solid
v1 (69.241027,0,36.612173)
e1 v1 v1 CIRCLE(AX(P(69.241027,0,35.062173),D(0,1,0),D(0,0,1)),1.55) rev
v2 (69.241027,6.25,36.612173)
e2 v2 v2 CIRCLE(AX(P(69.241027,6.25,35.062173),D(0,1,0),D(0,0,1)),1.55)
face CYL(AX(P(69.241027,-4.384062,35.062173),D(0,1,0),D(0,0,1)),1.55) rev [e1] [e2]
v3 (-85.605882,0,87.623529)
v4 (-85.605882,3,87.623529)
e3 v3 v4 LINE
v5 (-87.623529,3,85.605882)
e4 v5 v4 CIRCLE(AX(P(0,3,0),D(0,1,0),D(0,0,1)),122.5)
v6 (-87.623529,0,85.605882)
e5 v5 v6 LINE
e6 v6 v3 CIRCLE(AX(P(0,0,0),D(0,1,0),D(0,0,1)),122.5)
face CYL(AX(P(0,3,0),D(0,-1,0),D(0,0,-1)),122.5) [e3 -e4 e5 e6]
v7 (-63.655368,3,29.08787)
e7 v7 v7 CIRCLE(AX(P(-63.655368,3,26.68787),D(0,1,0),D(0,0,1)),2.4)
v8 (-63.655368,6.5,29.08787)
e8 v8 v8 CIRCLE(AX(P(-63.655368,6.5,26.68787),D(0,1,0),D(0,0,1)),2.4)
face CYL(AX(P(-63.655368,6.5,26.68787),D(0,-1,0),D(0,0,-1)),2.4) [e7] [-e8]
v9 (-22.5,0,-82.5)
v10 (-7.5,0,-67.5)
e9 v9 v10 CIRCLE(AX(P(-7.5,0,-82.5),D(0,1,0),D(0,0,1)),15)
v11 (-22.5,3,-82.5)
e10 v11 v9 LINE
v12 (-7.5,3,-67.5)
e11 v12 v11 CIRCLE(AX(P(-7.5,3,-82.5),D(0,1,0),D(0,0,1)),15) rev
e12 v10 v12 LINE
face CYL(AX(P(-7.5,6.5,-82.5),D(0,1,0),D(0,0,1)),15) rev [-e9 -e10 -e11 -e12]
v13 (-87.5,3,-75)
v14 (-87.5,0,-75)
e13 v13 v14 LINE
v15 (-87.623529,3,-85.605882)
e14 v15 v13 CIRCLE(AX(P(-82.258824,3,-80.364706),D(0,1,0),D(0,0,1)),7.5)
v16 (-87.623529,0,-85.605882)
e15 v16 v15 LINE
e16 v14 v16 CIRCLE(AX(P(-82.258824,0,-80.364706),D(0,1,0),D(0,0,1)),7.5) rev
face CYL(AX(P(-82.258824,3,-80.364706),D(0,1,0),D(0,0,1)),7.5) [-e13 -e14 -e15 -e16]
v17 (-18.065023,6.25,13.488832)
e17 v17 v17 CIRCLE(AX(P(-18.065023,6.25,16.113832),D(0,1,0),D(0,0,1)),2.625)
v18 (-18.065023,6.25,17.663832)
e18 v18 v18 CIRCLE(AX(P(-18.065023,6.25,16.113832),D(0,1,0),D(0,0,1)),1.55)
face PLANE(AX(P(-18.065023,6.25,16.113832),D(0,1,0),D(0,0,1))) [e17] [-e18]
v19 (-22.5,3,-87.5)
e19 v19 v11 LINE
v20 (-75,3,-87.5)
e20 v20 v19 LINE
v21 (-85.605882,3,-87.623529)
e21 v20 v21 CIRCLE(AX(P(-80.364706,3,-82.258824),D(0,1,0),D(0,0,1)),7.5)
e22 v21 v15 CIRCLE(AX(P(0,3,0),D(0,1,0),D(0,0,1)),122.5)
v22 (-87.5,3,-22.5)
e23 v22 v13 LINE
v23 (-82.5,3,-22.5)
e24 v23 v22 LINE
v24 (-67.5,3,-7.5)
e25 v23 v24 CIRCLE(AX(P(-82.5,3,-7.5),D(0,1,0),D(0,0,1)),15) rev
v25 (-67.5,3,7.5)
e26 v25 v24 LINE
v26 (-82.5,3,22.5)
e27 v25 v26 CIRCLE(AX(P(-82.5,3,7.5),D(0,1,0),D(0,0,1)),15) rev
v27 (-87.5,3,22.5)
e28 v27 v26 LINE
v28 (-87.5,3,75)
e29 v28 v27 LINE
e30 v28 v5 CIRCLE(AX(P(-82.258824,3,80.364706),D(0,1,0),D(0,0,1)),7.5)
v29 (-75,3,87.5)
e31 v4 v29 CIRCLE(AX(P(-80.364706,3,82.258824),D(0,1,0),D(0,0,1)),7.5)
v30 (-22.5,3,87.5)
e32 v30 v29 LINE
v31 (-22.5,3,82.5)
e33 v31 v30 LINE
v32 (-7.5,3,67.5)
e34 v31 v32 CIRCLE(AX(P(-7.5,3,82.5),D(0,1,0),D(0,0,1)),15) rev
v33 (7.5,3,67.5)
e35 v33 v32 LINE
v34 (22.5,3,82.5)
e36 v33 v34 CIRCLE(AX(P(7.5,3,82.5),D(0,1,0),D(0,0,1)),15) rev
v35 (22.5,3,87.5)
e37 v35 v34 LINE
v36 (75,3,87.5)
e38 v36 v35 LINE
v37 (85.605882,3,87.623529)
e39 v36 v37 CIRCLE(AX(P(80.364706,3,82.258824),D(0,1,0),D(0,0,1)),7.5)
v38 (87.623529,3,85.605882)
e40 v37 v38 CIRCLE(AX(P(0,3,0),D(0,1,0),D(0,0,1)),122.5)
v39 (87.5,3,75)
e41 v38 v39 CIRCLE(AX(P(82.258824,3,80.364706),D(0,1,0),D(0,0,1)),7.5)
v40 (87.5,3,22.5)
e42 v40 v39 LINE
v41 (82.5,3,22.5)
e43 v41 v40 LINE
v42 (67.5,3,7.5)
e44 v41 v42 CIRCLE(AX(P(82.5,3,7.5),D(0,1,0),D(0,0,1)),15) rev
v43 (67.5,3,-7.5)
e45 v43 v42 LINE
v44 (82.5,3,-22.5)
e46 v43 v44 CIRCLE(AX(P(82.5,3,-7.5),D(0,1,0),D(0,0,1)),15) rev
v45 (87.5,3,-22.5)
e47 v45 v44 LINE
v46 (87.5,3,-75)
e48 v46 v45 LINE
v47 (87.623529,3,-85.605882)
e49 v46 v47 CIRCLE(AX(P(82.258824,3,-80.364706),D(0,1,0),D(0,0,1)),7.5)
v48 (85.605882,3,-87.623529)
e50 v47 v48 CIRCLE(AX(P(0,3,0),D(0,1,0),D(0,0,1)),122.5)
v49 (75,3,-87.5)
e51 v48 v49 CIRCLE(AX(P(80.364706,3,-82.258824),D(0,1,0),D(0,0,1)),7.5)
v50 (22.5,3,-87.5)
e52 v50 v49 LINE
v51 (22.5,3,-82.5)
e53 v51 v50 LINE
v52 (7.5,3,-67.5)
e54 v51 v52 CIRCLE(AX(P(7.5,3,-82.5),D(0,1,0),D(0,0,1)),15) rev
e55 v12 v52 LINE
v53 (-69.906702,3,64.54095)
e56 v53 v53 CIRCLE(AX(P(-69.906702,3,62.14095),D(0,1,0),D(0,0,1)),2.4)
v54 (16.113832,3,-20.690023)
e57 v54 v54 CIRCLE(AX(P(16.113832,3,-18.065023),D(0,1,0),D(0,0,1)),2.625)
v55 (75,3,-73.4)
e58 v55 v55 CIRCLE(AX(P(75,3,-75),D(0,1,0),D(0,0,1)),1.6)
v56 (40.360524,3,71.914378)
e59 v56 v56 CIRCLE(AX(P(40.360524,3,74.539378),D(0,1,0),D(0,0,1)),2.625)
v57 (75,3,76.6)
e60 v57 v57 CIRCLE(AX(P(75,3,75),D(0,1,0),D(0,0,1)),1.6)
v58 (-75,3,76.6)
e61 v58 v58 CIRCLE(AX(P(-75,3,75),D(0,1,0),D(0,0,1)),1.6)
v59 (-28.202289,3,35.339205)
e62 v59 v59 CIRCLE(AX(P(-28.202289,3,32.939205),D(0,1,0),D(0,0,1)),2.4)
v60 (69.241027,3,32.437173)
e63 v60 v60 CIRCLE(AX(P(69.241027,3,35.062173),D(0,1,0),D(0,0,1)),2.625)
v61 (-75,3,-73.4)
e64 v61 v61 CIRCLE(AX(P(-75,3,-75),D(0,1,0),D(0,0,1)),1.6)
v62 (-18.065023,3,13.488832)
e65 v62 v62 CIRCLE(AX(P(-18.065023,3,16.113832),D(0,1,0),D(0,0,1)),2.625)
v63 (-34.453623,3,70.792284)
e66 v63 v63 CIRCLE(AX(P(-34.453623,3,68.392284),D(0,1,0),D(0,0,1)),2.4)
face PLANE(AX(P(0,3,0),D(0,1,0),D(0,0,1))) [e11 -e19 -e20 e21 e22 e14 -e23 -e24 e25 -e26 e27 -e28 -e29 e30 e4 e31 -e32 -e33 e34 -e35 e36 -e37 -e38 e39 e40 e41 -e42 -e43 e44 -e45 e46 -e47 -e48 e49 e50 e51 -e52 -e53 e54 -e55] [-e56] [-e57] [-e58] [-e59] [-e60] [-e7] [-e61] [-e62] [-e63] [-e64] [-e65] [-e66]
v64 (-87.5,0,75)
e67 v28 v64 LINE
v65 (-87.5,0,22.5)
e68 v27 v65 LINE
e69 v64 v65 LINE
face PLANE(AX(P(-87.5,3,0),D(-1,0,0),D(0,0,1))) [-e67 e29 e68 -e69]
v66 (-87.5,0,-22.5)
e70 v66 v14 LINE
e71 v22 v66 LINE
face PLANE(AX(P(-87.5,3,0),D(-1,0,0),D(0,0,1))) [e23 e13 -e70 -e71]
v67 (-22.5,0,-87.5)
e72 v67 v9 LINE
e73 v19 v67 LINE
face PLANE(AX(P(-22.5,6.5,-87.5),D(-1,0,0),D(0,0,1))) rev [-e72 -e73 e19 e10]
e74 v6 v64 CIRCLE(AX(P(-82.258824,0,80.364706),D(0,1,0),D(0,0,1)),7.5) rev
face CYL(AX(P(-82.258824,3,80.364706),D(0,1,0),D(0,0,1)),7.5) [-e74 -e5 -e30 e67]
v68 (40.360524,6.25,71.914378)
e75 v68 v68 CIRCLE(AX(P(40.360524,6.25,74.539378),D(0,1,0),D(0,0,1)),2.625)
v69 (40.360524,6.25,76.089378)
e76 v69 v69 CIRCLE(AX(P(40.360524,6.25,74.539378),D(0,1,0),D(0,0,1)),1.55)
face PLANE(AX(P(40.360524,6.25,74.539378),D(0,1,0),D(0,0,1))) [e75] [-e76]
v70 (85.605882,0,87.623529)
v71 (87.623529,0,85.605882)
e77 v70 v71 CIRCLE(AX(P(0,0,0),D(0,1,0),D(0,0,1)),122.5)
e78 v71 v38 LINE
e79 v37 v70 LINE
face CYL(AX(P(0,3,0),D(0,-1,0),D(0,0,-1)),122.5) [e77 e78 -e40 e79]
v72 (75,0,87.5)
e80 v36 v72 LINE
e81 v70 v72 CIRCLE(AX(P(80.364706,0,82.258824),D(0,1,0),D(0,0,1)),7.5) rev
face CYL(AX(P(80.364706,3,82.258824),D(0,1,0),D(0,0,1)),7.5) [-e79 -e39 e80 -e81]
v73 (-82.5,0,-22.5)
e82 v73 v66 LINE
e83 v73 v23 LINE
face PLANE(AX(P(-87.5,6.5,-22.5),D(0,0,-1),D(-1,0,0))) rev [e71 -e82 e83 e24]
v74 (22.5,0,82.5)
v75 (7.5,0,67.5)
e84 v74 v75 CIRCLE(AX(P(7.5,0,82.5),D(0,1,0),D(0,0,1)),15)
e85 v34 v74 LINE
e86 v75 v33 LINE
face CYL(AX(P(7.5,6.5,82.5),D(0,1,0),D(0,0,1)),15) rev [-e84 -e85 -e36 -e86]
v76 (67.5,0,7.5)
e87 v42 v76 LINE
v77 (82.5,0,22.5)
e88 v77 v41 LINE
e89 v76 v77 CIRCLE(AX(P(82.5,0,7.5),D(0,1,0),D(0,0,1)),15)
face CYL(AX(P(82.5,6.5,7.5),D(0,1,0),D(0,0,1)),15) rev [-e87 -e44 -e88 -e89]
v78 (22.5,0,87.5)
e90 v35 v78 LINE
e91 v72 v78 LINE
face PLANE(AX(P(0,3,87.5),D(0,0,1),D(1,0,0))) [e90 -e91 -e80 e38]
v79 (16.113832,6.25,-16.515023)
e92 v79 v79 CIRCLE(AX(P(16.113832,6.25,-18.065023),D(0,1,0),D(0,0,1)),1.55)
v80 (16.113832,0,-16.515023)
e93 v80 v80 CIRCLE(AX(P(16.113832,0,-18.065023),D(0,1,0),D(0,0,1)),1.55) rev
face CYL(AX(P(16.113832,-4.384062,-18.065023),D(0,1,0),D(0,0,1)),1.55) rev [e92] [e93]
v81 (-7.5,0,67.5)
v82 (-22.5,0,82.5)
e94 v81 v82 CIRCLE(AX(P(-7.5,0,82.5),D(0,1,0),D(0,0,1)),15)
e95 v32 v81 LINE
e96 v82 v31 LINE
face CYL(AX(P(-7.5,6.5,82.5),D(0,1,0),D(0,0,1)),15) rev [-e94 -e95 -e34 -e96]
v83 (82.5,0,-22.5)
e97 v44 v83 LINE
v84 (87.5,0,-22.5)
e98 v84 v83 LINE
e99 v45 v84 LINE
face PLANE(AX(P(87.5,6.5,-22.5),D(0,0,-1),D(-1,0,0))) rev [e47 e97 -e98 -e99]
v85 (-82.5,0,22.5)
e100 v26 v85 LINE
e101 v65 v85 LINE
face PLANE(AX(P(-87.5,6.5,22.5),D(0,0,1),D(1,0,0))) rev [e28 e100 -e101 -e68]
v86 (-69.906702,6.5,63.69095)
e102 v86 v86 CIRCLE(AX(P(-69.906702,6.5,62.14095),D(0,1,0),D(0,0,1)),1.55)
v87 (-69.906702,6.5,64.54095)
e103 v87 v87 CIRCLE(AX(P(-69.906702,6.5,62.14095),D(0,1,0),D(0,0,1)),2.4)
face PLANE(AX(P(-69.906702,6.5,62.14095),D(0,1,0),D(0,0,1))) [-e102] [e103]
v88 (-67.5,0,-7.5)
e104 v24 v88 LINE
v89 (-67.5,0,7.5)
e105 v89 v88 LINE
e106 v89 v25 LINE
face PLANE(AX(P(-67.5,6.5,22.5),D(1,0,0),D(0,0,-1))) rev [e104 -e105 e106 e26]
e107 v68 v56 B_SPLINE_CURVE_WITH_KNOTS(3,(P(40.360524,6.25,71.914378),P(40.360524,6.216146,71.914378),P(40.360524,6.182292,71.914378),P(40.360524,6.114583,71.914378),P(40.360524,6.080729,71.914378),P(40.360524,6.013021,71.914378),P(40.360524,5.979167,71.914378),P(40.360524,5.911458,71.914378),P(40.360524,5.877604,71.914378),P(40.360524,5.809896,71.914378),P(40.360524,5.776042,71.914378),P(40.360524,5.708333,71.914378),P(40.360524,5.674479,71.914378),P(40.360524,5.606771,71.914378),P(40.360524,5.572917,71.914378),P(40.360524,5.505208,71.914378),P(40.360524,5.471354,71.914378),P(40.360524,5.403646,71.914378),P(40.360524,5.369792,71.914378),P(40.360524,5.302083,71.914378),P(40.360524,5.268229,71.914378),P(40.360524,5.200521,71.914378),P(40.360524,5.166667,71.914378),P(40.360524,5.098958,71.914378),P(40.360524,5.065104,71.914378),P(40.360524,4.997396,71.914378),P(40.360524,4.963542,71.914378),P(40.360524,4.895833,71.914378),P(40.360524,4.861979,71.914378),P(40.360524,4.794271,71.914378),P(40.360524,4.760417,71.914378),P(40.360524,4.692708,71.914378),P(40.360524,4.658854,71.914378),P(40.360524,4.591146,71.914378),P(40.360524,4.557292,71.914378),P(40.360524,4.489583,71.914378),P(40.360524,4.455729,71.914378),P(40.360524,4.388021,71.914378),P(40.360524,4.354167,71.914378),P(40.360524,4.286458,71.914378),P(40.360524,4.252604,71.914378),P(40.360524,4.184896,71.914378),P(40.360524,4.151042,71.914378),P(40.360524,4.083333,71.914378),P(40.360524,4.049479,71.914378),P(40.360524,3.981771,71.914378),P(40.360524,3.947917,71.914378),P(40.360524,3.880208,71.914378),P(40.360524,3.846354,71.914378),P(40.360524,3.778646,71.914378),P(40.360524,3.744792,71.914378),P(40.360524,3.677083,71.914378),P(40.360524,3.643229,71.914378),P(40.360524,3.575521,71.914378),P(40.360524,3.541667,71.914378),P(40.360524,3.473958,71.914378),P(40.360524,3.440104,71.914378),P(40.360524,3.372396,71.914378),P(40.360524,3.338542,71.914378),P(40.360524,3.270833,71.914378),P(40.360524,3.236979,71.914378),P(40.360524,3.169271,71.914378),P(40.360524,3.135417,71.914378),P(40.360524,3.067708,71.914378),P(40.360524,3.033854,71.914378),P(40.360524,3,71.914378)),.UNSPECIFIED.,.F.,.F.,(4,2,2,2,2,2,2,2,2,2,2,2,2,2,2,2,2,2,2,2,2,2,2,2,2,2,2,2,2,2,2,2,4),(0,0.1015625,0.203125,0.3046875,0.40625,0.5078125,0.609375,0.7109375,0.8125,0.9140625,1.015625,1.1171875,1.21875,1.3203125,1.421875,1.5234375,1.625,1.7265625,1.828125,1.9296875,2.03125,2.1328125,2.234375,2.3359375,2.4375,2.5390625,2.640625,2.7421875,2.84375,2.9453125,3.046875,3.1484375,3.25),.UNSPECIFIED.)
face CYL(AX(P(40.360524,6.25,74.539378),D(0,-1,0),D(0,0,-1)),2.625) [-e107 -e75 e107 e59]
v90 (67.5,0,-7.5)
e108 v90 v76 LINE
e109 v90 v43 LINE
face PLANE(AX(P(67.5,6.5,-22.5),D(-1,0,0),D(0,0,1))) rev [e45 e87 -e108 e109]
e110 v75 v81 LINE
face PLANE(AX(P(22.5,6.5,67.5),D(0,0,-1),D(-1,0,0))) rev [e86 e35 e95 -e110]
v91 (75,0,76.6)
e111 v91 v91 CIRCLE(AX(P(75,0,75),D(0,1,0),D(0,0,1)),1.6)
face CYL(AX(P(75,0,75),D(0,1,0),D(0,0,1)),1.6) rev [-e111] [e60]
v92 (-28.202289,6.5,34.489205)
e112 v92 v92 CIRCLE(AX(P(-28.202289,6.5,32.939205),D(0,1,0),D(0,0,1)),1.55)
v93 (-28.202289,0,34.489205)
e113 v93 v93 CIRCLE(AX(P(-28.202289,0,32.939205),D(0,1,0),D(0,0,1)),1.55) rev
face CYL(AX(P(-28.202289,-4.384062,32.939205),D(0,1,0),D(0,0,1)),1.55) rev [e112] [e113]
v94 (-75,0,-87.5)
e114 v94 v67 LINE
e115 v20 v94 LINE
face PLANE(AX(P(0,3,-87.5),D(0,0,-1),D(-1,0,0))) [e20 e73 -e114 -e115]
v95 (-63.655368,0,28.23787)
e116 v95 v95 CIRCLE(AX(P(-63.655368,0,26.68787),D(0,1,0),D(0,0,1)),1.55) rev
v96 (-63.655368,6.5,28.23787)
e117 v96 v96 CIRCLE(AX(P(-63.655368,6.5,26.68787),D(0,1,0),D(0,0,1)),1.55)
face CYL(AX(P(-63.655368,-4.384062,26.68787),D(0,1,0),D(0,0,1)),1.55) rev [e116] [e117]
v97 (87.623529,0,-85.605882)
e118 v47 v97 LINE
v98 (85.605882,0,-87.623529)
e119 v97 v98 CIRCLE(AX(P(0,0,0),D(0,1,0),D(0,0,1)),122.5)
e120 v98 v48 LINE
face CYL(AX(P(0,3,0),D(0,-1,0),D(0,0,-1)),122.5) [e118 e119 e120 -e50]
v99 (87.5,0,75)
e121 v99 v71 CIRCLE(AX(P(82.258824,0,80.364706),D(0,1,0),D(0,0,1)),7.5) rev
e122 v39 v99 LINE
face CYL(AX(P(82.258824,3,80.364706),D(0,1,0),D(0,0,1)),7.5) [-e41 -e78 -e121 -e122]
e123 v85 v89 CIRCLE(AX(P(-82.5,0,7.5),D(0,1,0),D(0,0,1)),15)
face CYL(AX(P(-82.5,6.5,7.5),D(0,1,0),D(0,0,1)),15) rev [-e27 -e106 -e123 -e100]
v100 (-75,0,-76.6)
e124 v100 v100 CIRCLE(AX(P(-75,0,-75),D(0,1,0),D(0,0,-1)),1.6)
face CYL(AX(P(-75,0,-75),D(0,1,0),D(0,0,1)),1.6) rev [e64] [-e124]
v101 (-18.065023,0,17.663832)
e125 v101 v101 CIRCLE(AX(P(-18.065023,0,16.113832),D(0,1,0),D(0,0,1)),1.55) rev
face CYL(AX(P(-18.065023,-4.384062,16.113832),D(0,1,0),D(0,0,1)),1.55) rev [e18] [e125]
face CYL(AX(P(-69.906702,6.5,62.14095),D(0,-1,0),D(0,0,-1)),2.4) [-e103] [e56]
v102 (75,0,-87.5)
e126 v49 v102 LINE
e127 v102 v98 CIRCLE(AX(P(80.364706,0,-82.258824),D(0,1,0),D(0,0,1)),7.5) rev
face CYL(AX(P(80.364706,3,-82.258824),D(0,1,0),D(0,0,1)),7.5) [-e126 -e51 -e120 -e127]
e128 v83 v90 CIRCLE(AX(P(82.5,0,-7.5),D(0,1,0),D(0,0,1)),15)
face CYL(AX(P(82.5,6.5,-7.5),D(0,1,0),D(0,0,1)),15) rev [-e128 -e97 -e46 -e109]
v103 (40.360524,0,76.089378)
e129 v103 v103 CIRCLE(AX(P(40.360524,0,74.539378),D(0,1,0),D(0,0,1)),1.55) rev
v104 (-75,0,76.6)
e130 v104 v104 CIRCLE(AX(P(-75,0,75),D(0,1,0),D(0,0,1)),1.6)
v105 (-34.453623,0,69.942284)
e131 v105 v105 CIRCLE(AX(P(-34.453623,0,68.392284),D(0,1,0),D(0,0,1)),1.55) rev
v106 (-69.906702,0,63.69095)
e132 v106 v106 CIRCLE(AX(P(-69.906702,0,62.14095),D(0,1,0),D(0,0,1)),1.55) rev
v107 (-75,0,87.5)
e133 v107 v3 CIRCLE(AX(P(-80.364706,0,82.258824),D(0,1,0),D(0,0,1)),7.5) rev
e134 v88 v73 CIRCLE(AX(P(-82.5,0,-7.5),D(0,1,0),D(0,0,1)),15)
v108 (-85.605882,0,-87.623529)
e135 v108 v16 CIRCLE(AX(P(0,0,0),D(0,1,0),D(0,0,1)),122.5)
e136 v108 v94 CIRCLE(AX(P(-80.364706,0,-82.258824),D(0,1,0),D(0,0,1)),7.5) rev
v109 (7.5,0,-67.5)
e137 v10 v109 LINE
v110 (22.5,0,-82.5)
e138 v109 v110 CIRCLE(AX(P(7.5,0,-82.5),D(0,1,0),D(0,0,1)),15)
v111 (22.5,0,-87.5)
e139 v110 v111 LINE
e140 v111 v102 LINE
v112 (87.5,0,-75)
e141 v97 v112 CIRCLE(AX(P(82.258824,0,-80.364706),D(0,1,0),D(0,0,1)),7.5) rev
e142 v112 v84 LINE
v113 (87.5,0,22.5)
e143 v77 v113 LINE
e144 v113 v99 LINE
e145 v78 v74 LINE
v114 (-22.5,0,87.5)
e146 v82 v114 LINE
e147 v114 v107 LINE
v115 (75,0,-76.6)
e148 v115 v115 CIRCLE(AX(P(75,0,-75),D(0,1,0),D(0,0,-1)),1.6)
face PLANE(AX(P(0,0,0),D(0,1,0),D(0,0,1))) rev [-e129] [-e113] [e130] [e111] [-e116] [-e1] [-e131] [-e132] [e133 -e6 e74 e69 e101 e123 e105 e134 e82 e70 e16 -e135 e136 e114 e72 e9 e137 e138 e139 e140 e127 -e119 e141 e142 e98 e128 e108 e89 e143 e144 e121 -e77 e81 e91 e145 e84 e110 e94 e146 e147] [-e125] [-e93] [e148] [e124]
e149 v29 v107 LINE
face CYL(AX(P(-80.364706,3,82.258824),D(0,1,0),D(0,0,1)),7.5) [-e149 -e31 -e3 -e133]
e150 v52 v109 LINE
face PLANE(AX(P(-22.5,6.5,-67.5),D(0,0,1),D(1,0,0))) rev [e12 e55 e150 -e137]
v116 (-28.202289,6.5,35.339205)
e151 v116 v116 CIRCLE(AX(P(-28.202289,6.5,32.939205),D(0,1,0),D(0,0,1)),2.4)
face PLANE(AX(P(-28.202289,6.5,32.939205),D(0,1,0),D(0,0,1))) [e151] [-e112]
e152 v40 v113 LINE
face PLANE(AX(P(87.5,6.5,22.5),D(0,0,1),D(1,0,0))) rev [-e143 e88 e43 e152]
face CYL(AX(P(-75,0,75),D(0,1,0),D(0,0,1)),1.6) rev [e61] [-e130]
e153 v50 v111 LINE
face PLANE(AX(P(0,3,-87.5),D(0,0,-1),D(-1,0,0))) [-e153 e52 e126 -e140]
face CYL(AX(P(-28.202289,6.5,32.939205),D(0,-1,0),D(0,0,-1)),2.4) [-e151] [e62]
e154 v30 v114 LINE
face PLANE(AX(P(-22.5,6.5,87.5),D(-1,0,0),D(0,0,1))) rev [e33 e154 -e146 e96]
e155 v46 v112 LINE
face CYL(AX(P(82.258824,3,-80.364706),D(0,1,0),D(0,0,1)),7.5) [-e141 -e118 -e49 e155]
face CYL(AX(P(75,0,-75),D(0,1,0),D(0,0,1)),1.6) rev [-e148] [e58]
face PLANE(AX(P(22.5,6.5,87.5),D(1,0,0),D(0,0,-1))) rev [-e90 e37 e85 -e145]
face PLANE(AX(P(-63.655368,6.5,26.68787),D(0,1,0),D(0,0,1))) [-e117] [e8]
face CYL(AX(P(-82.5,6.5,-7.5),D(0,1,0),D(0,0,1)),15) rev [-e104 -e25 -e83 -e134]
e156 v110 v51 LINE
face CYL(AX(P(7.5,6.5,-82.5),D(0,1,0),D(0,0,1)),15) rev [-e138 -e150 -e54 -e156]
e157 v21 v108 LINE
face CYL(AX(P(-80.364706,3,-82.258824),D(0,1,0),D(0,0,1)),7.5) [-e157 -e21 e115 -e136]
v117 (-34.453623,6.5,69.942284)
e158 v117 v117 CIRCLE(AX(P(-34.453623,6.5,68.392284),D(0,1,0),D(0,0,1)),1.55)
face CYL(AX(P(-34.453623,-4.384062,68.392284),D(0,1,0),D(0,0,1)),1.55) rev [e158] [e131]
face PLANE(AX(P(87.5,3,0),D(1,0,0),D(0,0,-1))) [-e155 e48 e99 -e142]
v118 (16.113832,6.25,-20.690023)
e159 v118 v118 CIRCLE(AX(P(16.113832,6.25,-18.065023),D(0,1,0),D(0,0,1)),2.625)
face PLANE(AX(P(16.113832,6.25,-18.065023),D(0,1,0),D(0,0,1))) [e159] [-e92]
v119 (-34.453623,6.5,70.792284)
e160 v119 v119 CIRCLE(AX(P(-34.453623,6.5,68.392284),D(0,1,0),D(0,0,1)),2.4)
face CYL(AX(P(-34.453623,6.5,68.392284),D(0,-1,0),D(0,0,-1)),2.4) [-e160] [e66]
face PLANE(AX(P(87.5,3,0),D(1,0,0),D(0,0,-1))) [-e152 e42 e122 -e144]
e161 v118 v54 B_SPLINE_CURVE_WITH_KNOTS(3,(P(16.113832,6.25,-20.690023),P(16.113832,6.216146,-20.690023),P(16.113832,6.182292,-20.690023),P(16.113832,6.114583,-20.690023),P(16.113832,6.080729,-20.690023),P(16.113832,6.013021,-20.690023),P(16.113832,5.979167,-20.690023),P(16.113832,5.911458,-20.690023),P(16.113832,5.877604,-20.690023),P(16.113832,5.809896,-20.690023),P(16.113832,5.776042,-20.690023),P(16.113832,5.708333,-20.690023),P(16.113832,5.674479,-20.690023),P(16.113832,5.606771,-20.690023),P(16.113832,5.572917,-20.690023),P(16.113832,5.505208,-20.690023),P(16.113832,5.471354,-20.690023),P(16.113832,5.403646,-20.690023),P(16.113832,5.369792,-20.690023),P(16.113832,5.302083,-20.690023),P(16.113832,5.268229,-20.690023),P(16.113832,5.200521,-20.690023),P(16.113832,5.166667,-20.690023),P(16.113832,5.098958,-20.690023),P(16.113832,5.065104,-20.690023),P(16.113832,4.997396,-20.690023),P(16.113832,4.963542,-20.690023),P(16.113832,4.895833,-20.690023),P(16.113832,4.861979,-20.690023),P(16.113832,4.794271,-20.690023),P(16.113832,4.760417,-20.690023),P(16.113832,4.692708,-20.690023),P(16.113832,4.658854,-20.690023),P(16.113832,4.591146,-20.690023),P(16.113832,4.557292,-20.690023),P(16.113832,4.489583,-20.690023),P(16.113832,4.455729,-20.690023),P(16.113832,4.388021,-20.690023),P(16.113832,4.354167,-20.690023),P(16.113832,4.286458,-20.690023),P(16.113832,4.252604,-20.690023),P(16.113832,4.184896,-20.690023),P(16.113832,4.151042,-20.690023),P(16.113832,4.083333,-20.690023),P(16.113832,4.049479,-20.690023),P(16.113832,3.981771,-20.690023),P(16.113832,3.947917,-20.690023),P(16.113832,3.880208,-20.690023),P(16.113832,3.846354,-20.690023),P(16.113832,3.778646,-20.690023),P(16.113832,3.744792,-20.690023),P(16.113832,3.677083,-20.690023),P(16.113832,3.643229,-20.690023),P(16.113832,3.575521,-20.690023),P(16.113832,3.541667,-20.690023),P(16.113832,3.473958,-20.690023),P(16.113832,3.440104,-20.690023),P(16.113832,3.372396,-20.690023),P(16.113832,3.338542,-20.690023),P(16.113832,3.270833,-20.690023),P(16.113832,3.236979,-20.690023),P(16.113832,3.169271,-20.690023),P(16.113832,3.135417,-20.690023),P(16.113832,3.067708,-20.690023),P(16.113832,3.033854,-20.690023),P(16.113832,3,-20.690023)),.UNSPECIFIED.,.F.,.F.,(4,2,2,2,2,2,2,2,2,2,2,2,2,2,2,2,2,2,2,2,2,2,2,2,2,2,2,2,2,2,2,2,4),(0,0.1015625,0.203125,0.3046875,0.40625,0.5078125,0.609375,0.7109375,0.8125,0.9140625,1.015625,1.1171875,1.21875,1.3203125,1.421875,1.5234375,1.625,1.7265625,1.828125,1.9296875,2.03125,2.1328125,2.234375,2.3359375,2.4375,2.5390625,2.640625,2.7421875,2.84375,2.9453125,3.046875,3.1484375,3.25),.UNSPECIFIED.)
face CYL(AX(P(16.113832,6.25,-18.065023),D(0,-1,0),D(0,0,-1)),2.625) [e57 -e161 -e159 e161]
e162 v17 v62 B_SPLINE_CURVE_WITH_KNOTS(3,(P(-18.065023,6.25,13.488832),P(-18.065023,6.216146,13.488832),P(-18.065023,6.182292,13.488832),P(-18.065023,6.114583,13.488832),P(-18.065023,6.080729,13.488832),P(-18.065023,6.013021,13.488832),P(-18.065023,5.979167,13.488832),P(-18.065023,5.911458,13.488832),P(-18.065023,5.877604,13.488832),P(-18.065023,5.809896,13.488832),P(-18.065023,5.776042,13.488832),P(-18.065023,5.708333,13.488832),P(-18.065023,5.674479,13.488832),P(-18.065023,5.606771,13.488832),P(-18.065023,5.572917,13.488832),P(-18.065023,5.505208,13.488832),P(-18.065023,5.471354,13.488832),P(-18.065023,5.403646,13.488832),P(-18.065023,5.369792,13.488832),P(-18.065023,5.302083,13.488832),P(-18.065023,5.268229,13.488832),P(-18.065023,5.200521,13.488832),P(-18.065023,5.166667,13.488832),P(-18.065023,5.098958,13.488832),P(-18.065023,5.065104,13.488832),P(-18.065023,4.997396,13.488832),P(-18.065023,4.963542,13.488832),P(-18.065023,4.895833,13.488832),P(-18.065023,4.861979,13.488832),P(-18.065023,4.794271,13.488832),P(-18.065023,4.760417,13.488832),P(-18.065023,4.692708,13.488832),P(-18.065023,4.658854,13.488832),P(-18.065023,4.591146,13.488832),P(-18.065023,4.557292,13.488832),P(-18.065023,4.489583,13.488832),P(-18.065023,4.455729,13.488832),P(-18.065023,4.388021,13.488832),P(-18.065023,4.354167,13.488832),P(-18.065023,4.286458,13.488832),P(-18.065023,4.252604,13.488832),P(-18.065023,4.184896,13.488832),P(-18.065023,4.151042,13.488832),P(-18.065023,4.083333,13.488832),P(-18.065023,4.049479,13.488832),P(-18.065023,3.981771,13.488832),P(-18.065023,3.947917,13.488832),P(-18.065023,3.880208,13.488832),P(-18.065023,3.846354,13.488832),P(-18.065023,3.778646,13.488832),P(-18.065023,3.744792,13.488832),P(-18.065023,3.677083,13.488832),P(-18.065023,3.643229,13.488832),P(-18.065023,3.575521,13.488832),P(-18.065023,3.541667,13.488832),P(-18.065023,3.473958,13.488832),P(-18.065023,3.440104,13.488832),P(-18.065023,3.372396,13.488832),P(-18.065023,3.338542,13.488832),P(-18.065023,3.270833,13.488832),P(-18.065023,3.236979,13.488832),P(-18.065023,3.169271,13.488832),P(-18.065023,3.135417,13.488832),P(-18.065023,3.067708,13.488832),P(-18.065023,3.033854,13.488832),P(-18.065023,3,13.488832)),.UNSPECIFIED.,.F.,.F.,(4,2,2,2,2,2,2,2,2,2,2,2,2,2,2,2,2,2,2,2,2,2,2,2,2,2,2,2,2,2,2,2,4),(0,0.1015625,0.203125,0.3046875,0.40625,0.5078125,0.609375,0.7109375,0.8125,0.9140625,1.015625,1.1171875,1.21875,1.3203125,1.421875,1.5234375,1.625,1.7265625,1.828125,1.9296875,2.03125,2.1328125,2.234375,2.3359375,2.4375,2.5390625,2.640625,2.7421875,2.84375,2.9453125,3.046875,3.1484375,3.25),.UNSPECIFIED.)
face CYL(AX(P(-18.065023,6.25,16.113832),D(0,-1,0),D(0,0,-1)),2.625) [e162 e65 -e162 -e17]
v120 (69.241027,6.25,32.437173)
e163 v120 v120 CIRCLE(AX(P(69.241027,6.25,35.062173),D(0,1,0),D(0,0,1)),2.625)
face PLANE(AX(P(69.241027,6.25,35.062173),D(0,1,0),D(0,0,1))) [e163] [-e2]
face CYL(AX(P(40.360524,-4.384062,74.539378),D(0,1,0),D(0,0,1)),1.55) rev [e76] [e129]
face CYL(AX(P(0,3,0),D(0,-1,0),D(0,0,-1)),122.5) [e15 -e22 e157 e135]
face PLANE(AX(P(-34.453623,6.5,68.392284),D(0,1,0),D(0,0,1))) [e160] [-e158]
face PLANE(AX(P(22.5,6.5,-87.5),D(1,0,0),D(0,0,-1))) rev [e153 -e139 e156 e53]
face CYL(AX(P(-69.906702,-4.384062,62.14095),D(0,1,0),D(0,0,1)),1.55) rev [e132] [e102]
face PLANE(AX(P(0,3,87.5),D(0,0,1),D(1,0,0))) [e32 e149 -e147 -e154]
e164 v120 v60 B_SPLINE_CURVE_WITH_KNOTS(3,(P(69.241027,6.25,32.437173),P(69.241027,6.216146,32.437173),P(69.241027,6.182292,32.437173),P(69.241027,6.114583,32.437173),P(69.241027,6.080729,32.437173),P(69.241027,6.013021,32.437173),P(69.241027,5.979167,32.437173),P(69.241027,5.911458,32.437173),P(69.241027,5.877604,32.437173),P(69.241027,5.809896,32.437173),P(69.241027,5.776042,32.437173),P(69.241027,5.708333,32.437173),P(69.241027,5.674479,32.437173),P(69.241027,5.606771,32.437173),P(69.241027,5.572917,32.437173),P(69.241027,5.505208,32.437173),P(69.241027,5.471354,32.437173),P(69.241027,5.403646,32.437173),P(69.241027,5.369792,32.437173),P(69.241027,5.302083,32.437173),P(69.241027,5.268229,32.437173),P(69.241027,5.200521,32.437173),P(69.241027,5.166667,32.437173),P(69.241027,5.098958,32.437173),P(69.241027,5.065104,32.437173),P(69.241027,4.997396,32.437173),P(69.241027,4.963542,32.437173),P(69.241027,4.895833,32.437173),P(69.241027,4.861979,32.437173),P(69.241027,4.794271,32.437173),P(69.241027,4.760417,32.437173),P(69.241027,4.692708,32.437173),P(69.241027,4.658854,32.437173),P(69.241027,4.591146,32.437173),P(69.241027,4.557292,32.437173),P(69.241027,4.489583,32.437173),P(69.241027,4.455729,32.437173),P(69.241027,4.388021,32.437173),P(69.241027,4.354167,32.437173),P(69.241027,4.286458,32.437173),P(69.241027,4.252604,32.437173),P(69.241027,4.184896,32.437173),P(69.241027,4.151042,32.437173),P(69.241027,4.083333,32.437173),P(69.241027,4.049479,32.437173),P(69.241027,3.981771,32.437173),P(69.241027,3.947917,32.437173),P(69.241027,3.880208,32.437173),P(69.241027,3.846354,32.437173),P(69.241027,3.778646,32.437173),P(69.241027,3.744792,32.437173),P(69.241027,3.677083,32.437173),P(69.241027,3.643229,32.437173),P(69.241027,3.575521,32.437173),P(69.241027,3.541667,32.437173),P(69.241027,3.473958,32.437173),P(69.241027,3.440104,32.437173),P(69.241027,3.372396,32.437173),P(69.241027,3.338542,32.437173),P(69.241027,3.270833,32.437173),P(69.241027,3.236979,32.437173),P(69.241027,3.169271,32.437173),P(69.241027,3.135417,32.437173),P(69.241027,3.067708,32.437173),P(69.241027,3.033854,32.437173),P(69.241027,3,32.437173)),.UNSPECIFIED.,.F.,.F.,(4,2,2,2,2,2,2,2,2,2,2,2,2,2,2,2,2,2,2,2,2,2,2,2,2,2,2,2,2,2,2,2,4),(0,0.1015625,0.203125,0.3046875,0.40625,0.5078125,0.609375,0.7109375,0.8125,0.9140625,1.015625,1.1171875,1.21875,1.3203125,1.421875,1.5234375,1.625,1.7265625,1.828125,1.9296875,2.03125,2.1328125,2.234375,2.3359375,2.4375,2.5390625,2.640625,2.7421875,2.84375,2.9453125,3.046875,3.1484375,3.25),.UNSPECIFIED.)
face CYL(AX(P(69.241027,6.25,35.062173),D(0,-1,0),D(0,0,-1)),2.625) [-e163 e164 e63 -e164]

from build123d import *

# Parameters (mm, degrees)
SHELL_BOSS_DEPTH             = 3
SHELL_FILET_R                = 7.5
SHELL_PILLAR_HOLE_DEPTH      = 127.973590966
SHELL_PILLAR_HOLE_DEPTH_BACK = 127.973590966
SKETCH5_R                    = 1.6
SKETCH16_R                   = 2.625
ARDUINO_MOUNT_BOSS_DEPTH     = 3.25
SKETCH22_R                   = 1.55
ARDUINO_CUT_DEPTH            = 6.25
SKETCH20_R                   = 2.4
BOSS_EXTRUDE9_DEPTH          = 3.5
SKETCH37_R                   = 1.55
CUT_EXTRUDE4_DEPTH           = 6.5
CUT_EXTRUDE5_DEPTH           = 128.104456266
CUT_EXTRUDE5_DEPTH_BACK      = 128.104456266
SKETCH38_W                   = 45
SKETCH38_H                   = 20
SKETCH38_W_2                 = 20
SKETCH38_H_2                 = 45
FILLET1_R                    = 15


with BuildPart() as part:
    # Sketch1 → shell-boss (new body)
    with BuildSketch(Plane(origin=(0, 0, 0), x_dir=(1, 0, 0), z_dir=(0, 1, 0))):
        with BuildLine():
            Line((87.5, 75), (96.856853139, 75))
            ThreePointArc((96.856853139, 75), (86.620580695, 86.620580695), (75, 96.856853139))
            Line((75, 96.856853139), (75, 87.5))
            Line((75, 87.5), (-75, 87.5))
            Line((-75, 87.5), (-75, 96.856853139))
            ThreePointArc((-75, 96.856853139), (-86.620580695, 86.620580695), (-96.856853139, 75))
            Line((-96.856853139, 75), (-87.5, 75))
            Line((-87.5, 75), (-87.5, -75))
            Line((-87.5, -75), (-96.856853139, -75))
            ThreePointArc((-96.856853139, -75), (-86.620580695, -86.620580695), (-75, -96.856853139))
            Line((-75, -96.856853139), (-75, -87.5))
            Line((-75, -87.5), (75, -87.5))
            Line((75, -87.5), (75, -96.856853139))
            ThreePointArc((75, -96.856853139), (86.620580695, -86.620580695), (96.856853139, -75))
            Line((96.856853139, -75), (87.5, -75))
            Line((87.5, -75), (87.5, 75))
        make_face()
    extrude(amount=SHELL_BOSS_DEPTH)

    # shell-filet
    # the kernel refuses this fillet: 7.5 mm, written as the material it takes off along each edge
    with BuildSketch(Plane(origin=(-96.856853139, -35.154925645, 75), x_dir=(1, 0, 0), z_dir=(0, 1, 0)), Plane(origin=(-75, -35.154925645, -96.856853139), x_dir=(0, 0, 1), z_dir=(0, 1, 0)), Plane(origin=(96.856853139, -35.154925645, -75), x_dir=(-1, 0, 0), z_dir=(0, 1, 0))) as shell_filet_piece_1:
        with BuildLine():
            CenterArc((14.59802961, -5.364705882), SHELL_FILET_R, 134.332691644, 90)
            Line((9.233323727, -10.605882353), (9.12602961, -10.710705882))
            ThreePointArc((9.12602961, -10.710705882), (4.351219382, -5.53403146), (-0.118600228, -0.091836735))
            Line((-0.118600228, -0.091836735), (0, 0.15))
            ThreePointArc((0, 0.15), (4.67842657, 0.15), (9.25202961, 0.107294118))
            Line((9.25202961, 0.107294118), (9.356853139, 0))
        make_face()
    extrude(amount=73.30985129, mode=Mode.SUBTRACT)
    with BuildSketch(Plane(origin=(-96.856853139, -35.154925645, -75), x_dir=(0.656616644600313, 0, -0.7542244904760296), z_dir=(0, 1, 0)), Plane(origin=(75, -35.154925645, -96.856853139), x_dir=(0.7542244904760282, 0, 0.6566166446003142), z_dir=(0, 1, 0)), Plane(origin=(96.856853139, -35.154925645, 75), x_dir=(-0.656616644600296, 0, 0.7542244904760443), z_dir=(0, 1, 0)), Plane(origin=(-75, -35.154925645, 96.856853139), x_dir=(-0.7542244904760502, 0, -0.6566166446002892), z_dir=(0, 1, 0))) as shell_filet_piece_2:
        with BuildLine():
            CenterArc((13.631501781, -7.487636269), SHELL_FILET_R, 86.709654831, 90)
            Line((6.143865512, -7.057167791), (5.994112787, -7.048558422))
            ThreePointArc((5.994112787, -7.048558422), (2.958799083, -3.627076392), (-0.113133674, -0.098492497))
            Line((-0.113133674, -0.098492497), (-0.00860937, 0.149752725))
            ThreePointArc((-0.00860937, 0.149752725), (7.030985129, 0.351940947), (14.070579628, 0.149752725))
            Line((14.070579628, 0.149752725), (14.061970258, 0))
        make_face()
    extrude(amount=73.30985129, mode=Mode.SUBTRACT)
    with BuildSketch(Plane(origin=(75, -35.154925645, 96.856853139), x_dir=(0.754224490476002, 0, -0.6566166446003444), z_dir=(0, 1, 0))) as shell_filet_piece_3:
        with BuildLine():
            CenterArc((13.631501781, 7.487636269), SHELL_FILET_R, 183.290345169, 90)
            Line((6.143865512, 7.057167791), (5.994112787, 7.048558422))
            ThreePointArc((5.994112787, 7.048558422), (2.958799083, 3.627076392), (-0.113133674, 0.098492497))
            Line((-0.113133674, 0.098492497), (-0.00860937, -0.149752725))
            ThreePointArc((-0.00860937, -0.149752725), (7.030985129, -0.351940947), (14.070579628, -0.149752725))
            Line((14.070579628, -0.149752725), (14.061970258, 0))
        make_face()
    extrude(amount=73.30985129, mode=Mode.SUBTRACT)

    # Sketch5 → shell-pillar-hole (cut, two sides: drawn at the far end of the back side and taken through both)
    with BuildSketch(Plane(origin=(0, 3, 0), x_dir=(1, 0, 0), z_dir=(0, 1, 0)).offset(-SHELL_PILLAR_HOLE_DEPTH_BACK)):
        with Locations(Location((75, -75, 0), (0, 0, 270))):
            Circle(SKETCH5_R)
        with Locations(Location((-75, -75, 0), (0, 0, 270))):
            Circle(SKETCH5_R)
        with Locations(Location((75, 75, 0), (0, 0, 270))):
            Circle(SKETCH5_R)
        with Locations(Location((-75, 75, 0), (0, 0, 270))):
            Circle(SKETCH5_R)
    extrude(amount=SHELL_PILLAR_HOLE_DEPTH + SHELL_PILLAR_HOLE_DEPTH_BACK, mode=Mode.SUBTRACT)

    # Sketch16 → arduino-mount-boss (add)
    with BuildSketch(Plane(origin=(0, 3, 0), x_dir=(1, 0, 0), z_dir=(0, 1, 0))):
        with Locations(Location((16.113832172, 18.065022624, 0), (0, 0, 90))):
            Circle(SKETCH16_R)
        with Locations(Location((-18.065022624, -16.113832172, 0), (0, 0, 90))):
            Circle(SKETCH16_R)
        with Locations(Location((69.241027385, -35.062172588, 0), (0, 0, 90))):
            Circle(SKETCH16_R)
        with Locations(Location((40.360523699, -74.539378496, 0), (0, 0, 90))):
            Circle(SKETCH16_R)
    extrude(amount=ARDUINO_MOUNT_BOSS_DEPTH)

    # Sketch22 → arduino-cut (cut)
    with BuildSketch(Plane(origin=(0, 6.25, 0), x_dir=(1, 0, 0), z_dir=(0, 1, 0))):
        with Locations(Location((16.113832172, 18.065022624, 0), (0, 0, 270))):
            Circle(SKETCH22_R)
        with Locations(Location((-18.065022624, -16.113832172, 0), (0, 0, 270))):
            Circle(SKETCH22_R)
        with Locations(Location((69.241027385, -35.062172588, 0), (0, 0, 270))):
            Circle(SKETCH22_R)
        with Locations(Location((40.360523699, -74.539378496, 0), (0, 0, 270))):
            Circle(SKETCH22_R)
    extrude(amount=-ARDUINO_CUT_DEPTH, mode=Mode.SUBTRACT)

    # Sketch20 → Boss-Extrude9 (add)
    with BuildSketch(Plane(origin=(0, 3, 0), x_dir=(1, 0, 0), z_dir=(0, 1, 0))):
        with Locations(Location((-63.655367651, -26.687870454, 0), (0, 0, 270))):
            Circle(SKETCH20_R)
        with Locations(Location((-28.202288543, -32.93920485, 0), (0, 0, 270))):
            Circle(SKETCH20_R)
        with Locations(Location((-34.453622939, -68.392283958, 0), (0, 0, 270))):
            Circle(SKETCH20_R)
        with Locations(Location((-69.906702047, -62.140949562, 0), (0, 0, 270))):
            Circle(SKETCH20_R)
    extrude(amount=BOSS_EXTRUDE9_DEPTH)

    # Sketch37 → Cut-Extrude4 (cut)
    with BuildSketch(Plane(origin=(0, 6.5, 0), x_dir=(1, 0, 0), z_dir=(0, 1, 0))):
        with Locations(Location((-63.655367651, -26.687870454, 0), (0, 0, 270))):
            Circle(SKETCH37_R)
        with Locations(Location((-28.202288543, -32.93920485, 0), (0, 0, 270))):
            Circle(SKETCH37_R)
        with Locations(Location((-69.906702047, -62.140949562, 0), (0, 0, 270))):
            Circle(SKETCH37_R)
        with Locations(Location((-34.453622939, -68.392283958, 0), (0, 0, 270))):
            Circle(SKETCH37_R)
    extrude(amount=-CUT_EXTRUDE4_DEPTH, mode=Mode.SUBTRACT)

    # Sketch38 → Cut-Extrude5 (cut, two sides: drawn at the far end of the back side and taken through both)
    with BuildSketch(Plane.XZ.offset(-CUT_EXTRUDE5_DEPTH_BACK)):
        with Locations((0, 77.5)):
            Rectangle(SKETCH38_W, SKETCH38_H)
        with Locations((77.5, 0)):
            Rectangle(SKETCH38_W_2, SKETCH38_H_2)
        with Locations((0, -77.5)):
            Rectangle(SKETCH38_W, SKETCH38_H)
        with Locations((-77.5, 0)):
            Rectangle(SKETCH38_W_2, SKETCH38_H_2)
    extrude(amount=CUT_EXTRUDE5_DEPTH + CUT_EXTRUDE5_DEPTH_BACK, mode=Mode.SUBTRACT)

    # Fillet1
    fillet1_edges = [part.edges().sort_by_distance(p)[0] for p in [
        (22.5, 1.5, 67.5),
        (-22.5, 1.5, 67.5),
        (67.5, 1.5, -22.5),
        (67.5, 1.5, 22.5),
        (-22.5, 1.5, -67.5),
        (22.5, 1.5, -67.5),
        (-67.5, 1.5, 22.5),
        (-67.5, 1.5, -22.5),
    ]]
    fillet(fillet1_edges, radius=FILLET1_R)


solid = part.part
